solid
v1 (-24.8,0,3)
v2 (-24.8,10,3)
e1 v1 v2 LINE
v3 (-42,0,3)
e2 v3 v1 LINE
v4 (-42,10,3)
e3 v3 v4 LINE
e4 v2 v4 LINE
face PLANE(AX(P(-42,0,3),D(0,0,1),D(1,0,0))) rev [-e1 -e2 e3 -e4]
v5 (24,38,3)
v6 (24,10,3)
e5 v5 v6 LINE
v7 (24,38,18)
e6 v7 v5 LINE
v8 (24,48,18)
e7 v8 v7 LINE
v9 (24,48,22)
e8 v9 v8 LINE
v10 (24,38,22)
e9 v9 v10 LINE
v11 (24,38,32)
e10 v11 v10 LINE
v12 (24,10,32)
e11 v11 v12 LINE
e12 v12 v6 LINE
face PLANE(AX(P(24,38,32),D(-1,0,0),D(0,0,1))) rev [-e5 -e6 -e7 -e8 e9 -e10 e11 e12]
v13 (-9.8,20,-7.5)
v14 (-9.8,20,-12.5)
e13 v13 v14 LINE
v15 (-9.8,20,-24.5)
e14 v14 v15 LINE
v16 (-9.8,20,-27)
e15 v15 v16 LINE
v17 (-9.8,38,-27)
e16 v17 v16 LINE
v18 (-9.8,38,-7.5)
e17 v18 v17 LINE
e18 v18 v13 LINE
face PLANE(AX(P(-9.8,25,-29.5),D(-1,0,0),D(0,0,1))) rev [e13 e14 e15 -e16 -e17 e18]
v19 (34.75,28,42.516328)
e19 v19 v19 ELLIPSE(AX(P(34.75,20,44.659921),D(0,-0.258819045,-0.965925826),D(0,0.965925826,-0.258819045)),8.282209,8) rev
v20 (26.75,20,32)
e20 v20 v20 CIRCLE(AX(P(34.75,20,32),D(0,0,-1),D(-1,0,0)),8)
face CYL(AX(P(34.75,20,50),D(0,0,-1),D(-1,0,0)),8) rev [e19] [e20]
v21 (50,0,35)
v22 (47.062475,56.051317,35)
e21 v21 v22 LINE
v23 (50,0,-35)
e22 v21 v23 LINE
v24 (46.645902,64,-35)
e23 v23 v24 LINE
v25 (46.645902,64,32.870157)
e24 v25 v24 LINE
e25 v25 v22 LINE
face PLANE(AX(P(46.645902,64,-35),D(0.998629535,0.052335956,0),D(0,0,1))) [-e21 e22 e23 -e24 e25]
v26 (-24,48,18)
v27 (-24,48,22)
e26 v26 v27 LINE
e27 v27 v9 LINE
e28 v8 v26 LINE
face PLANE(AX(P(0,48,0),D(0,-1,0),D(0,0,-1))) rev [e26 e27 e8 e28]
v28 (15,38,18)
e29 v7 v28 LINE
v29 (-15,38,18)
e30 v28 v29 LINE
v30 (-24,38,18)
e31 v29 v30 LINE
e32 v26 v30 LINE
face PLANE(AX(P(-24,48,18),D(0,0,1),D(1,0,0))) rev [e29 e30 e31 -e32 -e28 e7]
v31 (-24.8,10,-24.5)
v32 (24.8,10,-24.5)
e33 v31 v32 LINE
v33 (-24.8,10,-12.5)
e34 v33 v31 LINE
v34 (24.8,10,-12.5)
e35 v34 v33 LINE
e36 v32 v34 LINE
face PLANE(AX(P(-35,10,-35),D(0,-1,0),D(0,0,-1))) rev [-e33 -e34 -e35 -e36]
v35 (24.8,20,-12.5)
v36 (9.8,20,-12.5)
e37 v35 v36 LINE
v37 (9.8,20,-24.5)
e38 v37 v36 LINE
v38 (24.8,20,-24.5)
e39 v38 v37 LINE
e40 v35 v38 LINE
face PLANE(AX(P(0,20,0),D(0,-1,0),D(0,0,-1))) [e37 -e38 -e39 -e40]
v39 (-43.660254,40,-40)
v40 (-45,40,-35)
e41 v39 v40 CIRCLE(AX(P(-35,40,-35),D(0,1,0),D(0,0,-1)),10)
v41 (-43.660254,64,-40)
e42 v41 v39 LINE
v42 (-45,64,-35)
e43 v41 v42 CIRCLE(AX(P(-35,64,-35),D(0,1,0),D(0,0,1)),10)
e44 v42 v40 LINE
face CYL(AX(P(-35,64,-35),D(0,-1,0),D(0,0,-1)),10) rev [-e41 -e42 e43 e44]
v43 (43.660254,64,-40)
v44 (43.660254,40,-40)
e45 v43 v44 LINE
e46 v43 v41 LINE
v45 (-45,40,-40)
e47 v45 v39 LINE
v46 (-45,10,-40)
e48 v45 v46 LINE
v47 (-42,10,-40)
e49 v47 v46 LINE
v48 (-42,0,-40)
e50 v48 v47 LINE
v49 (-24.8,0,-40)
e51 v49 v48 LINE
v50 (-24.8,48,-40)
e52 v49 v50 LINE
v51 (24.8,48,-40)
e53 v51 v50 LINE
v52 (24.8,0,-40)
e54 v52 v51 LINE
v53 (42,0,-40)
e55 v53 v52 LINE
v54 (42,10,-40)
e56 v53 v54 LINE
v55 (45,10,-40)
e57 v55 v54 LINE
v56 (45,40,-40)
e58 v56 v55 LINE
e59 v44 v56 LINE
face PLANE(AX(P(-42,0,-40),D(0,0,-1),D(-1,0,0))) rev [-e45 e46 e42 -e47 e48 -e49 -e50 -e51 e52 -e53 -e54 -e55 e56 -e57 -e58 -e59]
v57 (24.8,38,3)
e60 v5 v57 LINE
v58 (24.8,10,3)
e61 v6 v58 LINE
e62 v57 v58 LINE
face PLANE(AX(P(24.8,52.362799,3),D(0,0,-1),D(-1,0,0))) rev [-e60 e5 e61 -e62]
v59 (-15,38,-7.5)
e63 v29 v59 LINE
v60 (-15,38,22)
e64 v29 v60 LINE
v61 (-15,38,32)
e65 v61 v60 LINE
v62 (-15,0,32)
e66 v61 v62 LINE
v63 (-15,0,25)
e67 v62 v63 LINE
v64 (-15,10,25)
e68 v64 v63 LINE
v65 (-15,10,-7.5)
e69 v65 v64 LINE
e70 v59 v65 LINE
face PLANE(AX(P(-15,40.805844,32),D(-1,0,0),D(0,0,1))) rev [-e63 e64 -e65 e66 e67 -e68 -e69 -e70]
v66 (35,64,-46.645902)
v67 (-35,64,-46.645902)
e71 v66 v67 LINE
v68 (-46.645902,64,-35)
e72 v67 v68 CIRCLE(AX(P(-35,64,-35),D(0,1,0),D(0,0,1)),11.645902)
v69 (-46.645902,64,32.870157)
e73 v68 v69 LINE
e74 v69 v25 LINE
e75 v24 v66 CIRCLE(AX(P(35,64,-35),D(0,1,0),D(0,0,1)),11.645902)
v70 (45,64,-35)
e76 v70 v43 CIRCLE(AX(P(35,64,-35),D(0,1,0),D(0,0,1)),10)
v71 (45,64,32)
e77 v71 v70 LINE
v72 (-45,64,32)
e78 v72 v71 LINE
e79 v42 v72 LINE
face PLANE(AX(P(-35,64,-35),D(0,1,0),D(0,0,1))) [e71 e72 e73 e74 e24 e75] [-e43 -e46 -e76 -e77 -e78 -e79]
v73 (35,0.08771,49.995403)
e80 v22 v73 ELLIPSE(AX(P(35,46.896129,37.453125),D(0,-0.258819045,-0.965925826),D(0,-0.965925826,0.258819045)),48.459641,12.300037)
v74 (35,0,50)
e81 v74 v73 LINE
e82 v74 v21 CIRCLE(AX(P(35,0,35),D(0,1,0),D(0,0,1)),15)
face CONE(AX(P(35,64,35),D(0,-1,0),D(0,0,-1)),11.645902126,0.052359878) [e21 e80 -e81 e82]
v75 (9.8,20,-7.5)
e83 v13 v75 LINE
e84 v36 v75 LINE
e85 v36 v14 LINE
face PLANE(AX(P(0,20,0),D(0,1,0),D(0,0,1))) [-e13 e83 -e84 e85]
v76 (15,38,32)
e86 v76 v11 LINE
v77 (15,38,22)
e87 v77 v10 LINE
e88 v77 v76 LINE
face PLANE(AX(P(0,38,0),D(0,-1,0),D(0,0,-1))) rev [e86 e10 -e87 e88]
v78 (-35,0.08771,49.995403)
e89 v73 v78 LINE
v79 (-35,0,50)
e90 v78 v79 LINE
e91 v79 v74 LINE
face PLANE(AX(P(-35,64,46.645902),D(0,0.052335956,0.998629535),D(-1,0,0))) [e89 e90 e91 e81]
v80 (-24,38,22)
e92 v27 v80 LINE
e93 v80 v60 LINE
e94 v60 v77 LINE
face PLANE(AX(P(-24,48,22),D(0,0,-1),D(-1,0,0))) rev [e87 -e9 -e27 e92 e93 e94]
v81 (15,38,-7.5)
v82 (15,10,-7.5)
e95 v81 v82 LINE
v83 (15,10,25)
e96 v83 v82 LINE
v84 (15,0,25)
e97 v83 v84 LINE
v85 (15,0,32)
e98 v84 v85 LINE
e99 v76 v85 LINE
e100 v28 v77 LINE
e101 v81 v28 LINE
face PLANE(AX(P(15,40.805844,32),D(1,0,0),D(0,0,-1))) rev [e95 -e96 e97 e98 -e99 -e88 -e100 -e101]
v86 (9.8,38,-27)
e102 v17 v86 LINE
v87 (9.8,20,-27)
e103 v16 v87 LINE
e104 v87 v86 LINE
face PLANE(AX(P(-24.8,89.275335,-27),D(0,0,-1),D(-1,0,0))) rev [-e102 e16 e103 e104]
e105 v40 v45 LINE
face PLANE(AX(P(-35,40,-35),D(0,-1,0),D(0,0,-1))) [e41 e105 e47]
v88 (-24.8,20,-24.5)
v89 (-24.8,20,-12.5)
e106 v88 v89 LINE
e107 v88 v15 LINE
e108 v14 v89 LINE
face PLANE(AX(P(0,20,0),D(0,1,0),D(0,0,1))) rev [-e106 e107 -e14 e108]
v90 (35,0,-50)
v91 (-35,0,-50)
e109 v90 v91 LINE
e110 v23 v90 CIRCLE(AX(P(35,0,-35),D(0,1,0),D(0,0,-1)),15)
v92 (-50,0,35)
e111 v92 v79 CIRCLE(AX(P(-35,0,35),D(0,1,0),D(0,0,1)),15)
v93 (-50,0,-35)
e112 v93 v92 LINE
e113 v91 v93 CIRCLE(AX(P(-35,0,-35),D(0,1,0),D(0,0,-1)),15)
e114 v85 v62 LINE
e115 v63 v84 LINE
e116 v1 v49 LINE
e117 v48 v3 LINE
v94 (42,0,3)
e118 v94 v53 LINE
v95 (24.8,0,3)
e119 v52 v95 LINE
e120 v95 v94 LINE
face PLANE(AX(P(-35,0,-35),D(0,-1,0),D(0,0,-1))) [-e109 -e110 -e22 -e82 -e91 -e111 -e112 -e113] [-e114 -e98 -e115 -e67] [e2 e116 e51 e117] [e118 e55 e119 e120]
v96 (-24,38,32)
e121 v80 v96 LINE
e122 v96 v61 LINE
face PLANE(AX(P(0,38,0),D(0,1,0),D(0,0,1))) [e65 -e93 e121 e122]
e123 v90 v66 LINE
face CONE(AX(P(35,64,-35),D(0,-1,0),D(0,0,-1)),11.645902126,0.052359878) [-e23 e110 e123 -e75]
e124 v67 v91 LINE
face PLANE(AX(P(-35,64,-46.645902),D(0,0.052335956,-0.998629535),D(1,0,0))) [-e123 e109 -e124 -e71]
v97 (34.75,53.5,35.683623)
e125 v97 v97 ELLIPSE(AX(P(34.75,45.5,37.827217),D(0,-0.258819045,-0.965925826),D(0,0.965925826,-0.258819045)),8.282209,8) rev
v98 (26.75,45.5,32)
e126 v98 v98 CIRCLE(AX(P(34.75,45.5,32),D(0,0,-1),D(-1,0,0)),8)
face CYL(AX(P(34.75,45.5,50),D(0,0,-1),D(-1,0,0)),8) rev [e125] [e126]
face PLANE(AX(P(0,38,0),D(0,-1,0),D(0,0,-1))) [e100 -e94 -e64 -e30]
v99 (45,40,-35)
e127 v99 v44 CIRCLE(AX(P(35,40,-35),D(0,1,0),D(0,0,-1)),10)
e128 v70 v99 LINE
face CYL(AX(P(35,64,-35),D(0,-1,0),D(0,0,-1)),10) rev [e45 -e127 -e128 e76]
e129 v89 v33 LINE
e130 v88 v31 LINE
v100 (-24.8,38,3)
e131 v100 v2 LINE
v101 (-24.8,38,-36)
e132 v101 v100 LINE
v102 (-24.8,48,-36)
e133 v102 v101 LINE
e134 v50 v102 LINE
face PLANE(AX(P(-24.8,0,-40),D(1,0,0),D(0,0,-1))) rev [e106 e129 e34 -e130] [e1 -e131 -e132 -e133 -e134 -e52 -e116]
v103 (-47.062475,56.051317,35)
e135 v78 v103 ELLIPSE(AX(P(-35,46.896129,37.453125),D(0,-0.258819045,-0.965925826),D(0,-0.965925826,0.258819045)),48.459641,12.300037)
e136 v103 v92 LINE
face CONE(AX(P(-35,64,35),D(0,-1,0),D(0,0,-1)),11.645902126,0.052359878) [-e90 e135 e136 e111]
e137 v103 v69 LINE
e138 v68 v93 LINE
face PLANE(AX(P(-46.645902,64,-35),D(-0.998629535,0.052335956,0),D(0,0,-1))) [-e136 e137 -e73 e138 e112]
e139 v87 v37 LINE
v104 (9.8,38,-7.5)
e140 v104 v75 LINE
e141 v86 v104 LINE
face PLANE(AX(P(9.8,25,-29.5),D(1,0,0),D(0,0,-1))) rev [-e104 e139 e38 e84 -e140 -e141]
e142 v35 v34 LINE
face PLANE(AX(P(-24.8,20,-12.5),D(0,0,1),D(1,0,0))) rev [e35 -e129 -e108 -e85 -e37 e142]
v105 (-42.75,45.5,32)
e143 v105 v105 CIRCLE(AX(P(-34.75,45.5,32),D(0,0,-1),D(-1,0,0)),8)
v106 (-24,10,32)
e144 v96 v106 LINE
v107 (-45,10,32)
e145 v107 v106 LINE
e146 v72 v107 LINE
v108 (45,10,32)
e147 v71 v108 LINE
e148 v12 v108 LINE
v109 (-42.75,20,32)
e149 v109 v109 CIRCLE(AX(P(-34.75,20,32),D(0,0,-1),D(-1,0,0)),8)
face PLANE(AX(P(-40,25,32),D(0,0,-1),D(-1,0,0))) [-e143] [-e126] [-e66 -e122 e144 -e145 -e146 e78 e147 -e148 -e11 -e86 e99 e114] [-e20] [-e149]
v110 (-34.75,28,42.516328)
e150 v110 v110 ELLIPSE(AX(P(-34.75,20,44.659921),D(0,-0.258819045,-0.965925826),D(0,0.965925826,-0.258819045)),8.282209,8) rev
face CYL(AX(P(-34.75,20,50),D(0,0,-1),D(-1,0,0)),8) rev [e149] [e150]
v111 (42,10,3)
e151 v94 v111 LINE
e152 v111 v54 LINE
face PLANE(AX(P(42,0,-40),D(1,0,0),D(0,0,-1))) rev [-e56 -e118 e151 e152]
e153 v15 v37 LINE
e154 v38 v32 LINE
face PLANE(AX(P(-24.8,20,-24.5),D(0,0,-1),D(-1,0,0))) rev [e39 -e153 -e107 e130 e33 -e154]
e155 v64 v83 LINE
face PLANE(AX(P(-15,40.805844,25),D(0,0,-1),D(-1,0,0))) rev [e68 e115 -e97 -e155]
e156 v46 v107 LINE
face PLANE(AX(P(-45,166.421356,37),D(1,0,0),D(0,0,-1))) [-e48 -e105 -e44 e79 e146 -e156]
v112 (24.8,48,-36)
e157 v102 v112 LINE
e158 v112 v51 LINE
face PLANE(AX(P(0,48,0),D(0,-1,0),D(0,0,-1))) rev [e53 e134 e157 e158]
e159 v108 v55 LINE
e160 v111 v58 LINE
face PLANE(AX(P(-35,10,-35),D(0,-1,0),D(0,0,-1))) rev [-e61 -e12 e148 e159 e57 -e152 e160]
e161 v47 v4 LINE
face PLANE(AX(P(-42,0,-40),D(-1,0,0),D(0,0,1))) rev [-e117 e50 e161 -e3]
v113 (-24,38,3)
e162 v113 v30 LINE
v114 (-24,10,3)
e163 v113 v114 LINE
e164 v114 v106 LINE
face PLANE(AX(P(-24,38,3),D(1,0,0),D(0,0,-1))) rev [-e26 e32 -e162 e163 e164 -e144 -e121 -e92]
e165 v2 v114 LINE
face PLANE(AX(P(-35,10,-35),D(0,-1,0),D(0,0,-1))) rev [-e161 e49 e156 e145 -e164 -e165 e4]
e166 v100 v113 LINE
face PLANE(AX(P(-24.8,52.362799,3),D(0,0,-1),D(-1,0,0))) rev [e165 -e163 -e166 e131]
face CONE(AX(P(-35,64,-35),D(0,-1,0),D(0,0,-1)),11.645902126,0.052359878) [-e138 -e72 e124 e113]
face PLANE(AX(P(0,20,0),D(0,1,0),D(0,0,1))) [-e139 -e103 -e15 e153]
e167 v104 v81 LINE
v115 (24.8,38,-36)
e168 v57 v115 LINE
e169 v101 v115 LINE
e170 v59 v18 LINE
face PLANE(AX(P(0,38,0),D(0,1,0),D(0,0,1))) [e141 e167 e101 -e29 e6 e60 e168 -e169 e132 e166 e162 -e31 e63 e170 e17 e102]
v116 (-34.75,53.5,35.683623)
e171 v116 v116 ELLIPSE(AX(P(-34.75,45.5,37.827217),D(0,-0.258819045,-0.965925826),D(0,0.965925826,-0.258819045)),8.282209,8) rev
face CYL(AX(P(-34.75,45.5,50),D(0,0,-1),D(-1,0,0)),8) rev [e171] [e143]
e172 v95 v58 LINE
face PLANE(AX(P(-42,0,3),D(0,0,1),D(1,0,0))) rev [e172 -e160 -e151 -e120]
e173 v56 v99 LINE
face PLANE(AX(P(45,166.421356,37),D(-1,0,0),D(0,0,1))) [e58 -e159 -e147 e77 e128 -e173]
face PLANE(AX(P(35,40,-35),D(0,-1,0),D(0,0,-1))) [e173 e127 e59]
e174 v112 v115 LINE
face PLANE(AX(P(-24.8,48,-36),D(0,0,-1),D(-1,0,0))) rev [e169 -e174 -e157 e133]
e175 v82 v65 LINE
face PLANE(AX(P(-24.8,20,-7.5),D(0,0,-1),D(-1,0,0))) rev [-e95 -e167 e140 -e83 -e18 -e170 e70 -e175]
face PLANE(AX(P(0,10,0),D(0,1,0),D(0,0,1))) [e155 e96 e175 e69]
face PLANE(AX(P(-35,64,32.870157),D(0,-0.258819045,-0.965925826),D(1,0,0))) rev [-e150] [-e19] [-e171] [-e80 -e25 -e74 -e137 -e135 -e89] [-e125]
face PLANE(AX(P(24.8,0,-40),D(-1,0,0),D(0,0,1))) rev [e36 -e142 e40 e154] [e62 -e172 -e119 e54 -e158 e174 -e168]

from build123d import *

# Parameters (mm, degrees)
BOSS_EXTRUDE1_DEPTH  = 10
SKETCH2_W            = 17.2
SKETCH2_H            = 43
CUT_EXTRUDE1_DEPTH   = 72.414284285
SKETCH3_W            = 90
SKETCH3_H            = 34
SKETCH3_W_2          = 80
SKETCH3_H_2          = 24
BOSS_EXTRUDE3_DEPTH  = 15
SKETCH4_W            = 49.6
SKETCH4_H            = 5
BOSS_EXTRUDE4_DEPTH  = 10
SKETCH5_W            = 15
SKETCH5_H            = 22
BOSS_EXTRUDE5_DEPTH  = 5
SKETCH6_W            = 90
SKETCH6_H            = 77
BOSS_EXTRUDE6_DEPTH  = 15
BOSS_EXTRUDE8_DEPTH  = 39
CHAMFER1_SIZE        = 64
CHAMFER1_SIZE_2      = 3.354097874
CHAMFER3_SIZE        = 64
CHAMFER3_SIZE_2      = 13.775745352
CUT_EXTRUDE6_DEPTH   = 2.5
CUT_EXTRUDE8_DEPTH   = 15
CUT_EXTRUDE9_DEPTH   = 15
SKETCH22_W           = 30
SKETCH22_H           = 7
CUT_EXTRUDE10_DEPTH  = 10
SKETCH25_R           = 8
CUT_EXTRUDE19_DEPTH  = 116.41230437
SKETCH29_W           = 9
SKETCH29_H           = 29
BOSS_EXTRUDE10_DEPTH = 28
SKETCH31_W           = 49.6
SKETCH31_H           = 13
BOSS_EXTRUDE12_DEPTH = 28
SKETCH30_W           = 49.6
SKETCH30_H           = 4
SKETCH30_W_2         = 48
BOSS_EXTRUDE11_DEPTH = 10
SKETCH33_W           = 15
SKETCH33_H           = 19.5
BOSS_EXTRUDE13_DEPTH = 13
SKETCH23_W           = 30
SKETCH23_H           = 28.995403325
CUT_EXTRUDE17_DEPTH  = 5
SKETCH34_W           = 9.8
SKETCH34_H           = 10.5
BOSS_EXTRUDE14_DEPTH = 28
SKETCH35_W           = 30
SKETCH35_H           = 10.5
CUT_EXTRUDE22_DEPTH  = 5
SKETCH37_W           = 30
SKETCH37_H           = 32.5
BOSS_EXTRUDE15_DEPTH = 5


with BuildPart() as part:
    # Sketch1 → Boss-Extrude1 (new body)
    with BuildSketch(Plane(origin=(0, 0, 0), x_dir=(1, 0, 0), z_dir=(0, 1, 0))):
        with BuildLine():
            Line((-35, 50), (35, 50))
            ThreePointArc((35, 50), (45.606601718, 45.606601718), (50, 35))
            Line((50, 35), (50, -35))
            ThreePointArc((50, -35), (45.606601718, -45.606601718), (35, -50))
            Line((35, -50), (-35, -50))
            ThreePointArc((-35, -50), (-45.606601718, -45.606601718), (-50, -35))
            Line((-50, -35), (-50, 35))
            ThreePointArc((-50, 35), (-45.606601718, 45.606601718), (-35, 50))
        make_face()
    extrude(amount=BOSS_EXTRUDE1_DEPTH)

    # Sketch2 → Cut-Extrude1 (cut, through all)
    with BuildSketch(Plane(origin=(0, 10, 0), x_dir=(1, 0, 0), z_dir=(0, 1, 0))):
        with Locations((-33.4, 18.5)):
            Rectangle(SKETCH2_W, SKETCH2_H)
        with Locations((33.4, 18.5)):
            Rectangle(SKETCH2_W, SKETCH2_H)
    extrude(amount=-CUT_EXTRUDE1_DEPTH, mode=Mode.SUBTRACT)

    # Sketch3 → Boss-Extrude3 (add)
    with BuildSketch(Plane(origin=(0, 10, 0), x_dir=(1, 0, 0), z_dir=(0, 1, 0))):
        with Locations((0, -20)):
            Rectangle(SKETCH3_W, SKETCH3_H)
        with Locations((0, -20)):
            Rectangle(SKETCH3_W_2, SKETCH3_H_2, mode=Mode.SUBTRACT)
    extrude(amount=BOSS_EXTRUDE3_DEPTH)

    # Sketch4 → Boss-Extrude4 (add)
    with BuildSketch(Plane(origin=(0, 10, 0), x_dir=(1, 0, 0), z_dir=(0, 1, 0))):
        with Locations((0, 10)):
            Rectangle(SKETCH4_W, SKETCH4_H)
        with Locations((0, 27)):
            Rectangle(SKETCH4_W, SKETCH4_H)
    extrude(amount=BOSS_EXTRUDE4_DEPTH)

    # Sketch5 → Boss-Extrude5 (add)
    with BuildSketch(Plane(origin=(0, 20, 0), x_dir=(1, 0, 0), z_dir=(0, 1, 0))):
        with Locations((-17.3, 18.5)):
            Rectangle(SKETCH5_W, SKETCH5_H)
        with Locations((17.3, 18.5)):
            Rectangle(SKETCH5_W, SKETCH5_H)
    extrude(amount=BOSS_EXTRUDE5_DEPTH)

    # Sketch6 → Boss-Extrude6 (add)
    with BuildSketch(Plane(origin=(0, 10, 0), x_dir=(1, 0, 0), z_dir=(0, 1, 0))):
        with BuildLine():
            Line((-50, 35), (-50, -35))
            ThreePointArc((-50, -35), (-45.606601718, -45.606601718), (-35, -50))
            Line((-35, -50), (35, -50))
            ThreePointArc((35, -50), (45.606601718, -45.606601718), (50, -35))
            Line((50, -35), (50, 35))
            ThreePointArc((50, 35), (45.606601718, 45.606601718), (35, 50))
            Line((35, 50), (-35, 50))
            ThreePointArc((-35, 50), (-45.606601718, 45.606601718), (-50, 35))
        make_face()
        with Locations((0, 1.5)):
            Rectangle(SKETCH6_W, SKETCH6_H, mode=Mode.SUBTRACT)
    extrude(amount=BOSS_EXTRUDE6_DEPTH)

    # Sketch9 → Boss-Extrude8 (add)
    with BuildSketch(Plane(origin=(0, 25, 0), x_dir=(1, 0, 0), z_dir=(0, 1, 0))):
        with BuildLine():
            Line((-50, 35), (-50, -35))
            ThreePointArc((-50, -35), (-45.606601718, -45.606601718), (-35, -50))
            Line((-35, -50), (35, -50))
            ThreePointArc((35, -50), (45.606601718, -45.606601718), (50, -35))
            Line((50, -35), (50, 35))
            ThreePointArc((50, 35), (45.606601718, 45.606601718), (35, 50))
            Line((35, 50), (-35, 50))
            ThreePointArc((-35, 50), (-45.606601718, 45.606601718), (-50, 35))
        make_face()
        with BuildLine():
            Line((-45, 35), (-45, -32))
            Line((-45, -32), (45, -32))
            Line((45, -32), (45, 35))
            ThreePointArc((45, 35), (44.659258263, 37.588190451), (43.660254038, 40))
            Line((43.660254038, 40), (-43.660254038, 40))
            ThreePointArc((-43.660254038, 40), (-44.659258263, 37.588190451), (-45, 35))
        make_face(mode=Mode.SUBTRACT)
    extrude(amount=BOSS_EXTRUDE8_DEPTH)

    # Chamfer1
    # the kernel refuses this chamfer: 64, 3.354097874 mm, written as the material it takes off along each edge
    with BuildSketch(Plane(origin=(-35, 64, 50), x_dir=(0, -0.9999979738662979, 0.002013023422382214), z_dir=(1, 0, 0)), Plane(origin=(50, 64, 35), x_dir=(0.002013023422382214, -0.9999979738662979, 0), z_dir=(0, 0, -1)), Plane(origin=(-50, 64, -35), x_dir=(-0.002013023422382214, -0.9999979738662979, 0), z_dir=(0, 0, 1)), Plane(origin=(35, 64, -50), x_dir=(0, -0.9999979738662979, -0.002013023422382214), z_dir=(-1, 0, 0))) as chamfer1_piece_1:
        Polygon((CHAMFER1_SIZE * 0.999997973866, CHAMFER1_SIZE * 0.00201302342238), (-CHAMFER1_SIZE_2 * 0.00201302342245, CHAMFER1_SIZE_2 * 0.9999979739), (0, 0), align=None)
    extrude(amount=70, mode=Mode.SUBTRACT)
    with BuildSketch(Plane(origin=(35, 64, 35), x_dir=(0, 0, 1), z_dir=(-1, 0, 0))) as chamfer1_piece_2:
        Polygon((15, -CHAMFER1_SIZE), (15 - CHAMFER1_SIZE_2, 0), (15, 0), align=None)
    revolve(axis=Axis((35, 64, 35), (0, 1, 0)), revolution_arc=90, mode=Mode.SUBTRACT)
    with BuildSketch(Plane(origin=(-35, 64, 35), x_dir=(-1, 0, 0), z_dir=(0, 0, -1))) as chamfer1_piece_3:
        Polygon((15, -CHAMFER1_SIZE), (15 - CHAMFER1_SIZE_2, 0), (15, 0), align=None)
    revolve(axis=Axis((-35, 64, 35), (0, 1, 0)), revolution_arc=90, mode=Mode.SUBTRACT)
    with BuildSketch(Plane(origin=(35, 64, -35), x_dir=(1, 0, 0), z_dir=(0, 0, 1))) as chamfer1_piece_4:
        Polygon((15, -CHAMFER1_SIZE), (15 - CHAMFER1_SIZE_2, 0), (15, 0), align=None)
    revolve(axis=Axis((35, 64, -35), (0, 1, 0)), revolution_arc=90, mode=Mode.SUBTRACT)
    with BuildSketch(Plane(origin=(-35, 64, -35), x_dir=(0, 0, -1), z_dir=(1, 0, 0))) as chamfer1_piece_5:
        Polygon((15 - CHAMFER1_SIZE_2, 0), (15, -CHAMFER1_SIZE), (15, 0), align=None)
    revolve(axis=Axis((-35, 64, -35), (0, 1, 0)), revolution_arc=90, mode=Mode.SUBTRACT)

    # Chamfer3
    # the kernel refuses this chamfer: 64, 13.775745352 mm, written as the material it takes off along each edge
    with BuildSketch(Plane(origin=(-201.265469314, 64, 46.645902126), x_dir=(0, -0.9981787050157903, 0.06032638604292662), z_dir=(1, 0, 0))) as chamfer3_piece_1:
        Polygon((CHAMFER3_SIZE * 0.999967974892, CHAMFER3_SIZE * 0.00800307379952), (-CHAMFER3_SIZE_2 * 0.060326386045, CHAMFER3_SIZE_2 * 0.99817870505), (0, 0), align=None)
    extrude(amount=402.530938629, mode=Mode.SUBTRACT)

    # Sketch17 → Cut-Extrude6 (cut)
    with BuildSketch(Plane(origin=(0, 0, -29.5), x_dir=(-1, 0, 0), z_dir=(0, 0, -1))):
        Polygon((-24.8, 10), (24.8, 10), (24.8, 25), (9.8, 25), (9.8, 20), (-9.8, 20), (-9.8, 25), (-24.8, 25), align=None)
    extrude(amount=-CUT_EXTRUDE6_DEPTH, mode=Mode.SUBTRACT)

    # Sketch20 → Cut-Extrude8 (cut)
    with BuildSketch(Plane.XZ.offset(-25)):
        with BuildLine():
            Line((-45, -35), (-45, -40))
            Line((-45, -40), (-43.660254038, -40))
            ThreePointArc((-43.660254038, -40), (-44.659258263, -37.588190451), (-45, -35))
        make_face()
        with BuildLine():
            Line((45, -40), (45, -35))
            ThreePointArc((45, -35), (44.659258263, -37.588190451), (43.660254038, -40))
            Line((43.660254038, -40), (45, -40))
        make_face()
    extrude(amount=-CUT_EXTRUDE8_DEPTH, mode=Mode.SUBTRACT)

    # Sketch21 → Cut-Extrude9 (cut)
    with BuildSketch(Plane(origin=(0, 25, 0), x_dir=(1, 0, 0), z_dir=(0, 1, 0))):
        Polygon((40, -8), (40, -32), (45, -32), (45, -3), (-45, -3), (-45, -32), (-40, -32), (-40, -8), align=None)
    extrude(amount=-CUT_EXTRUDE9_DEPTH, mode=Mode.SUBTRACT)

    # Sketch22 → Cut-Extrude10 (cut)
    with BuildSketch(Plane.XZ):
        with Locations((0, 28.5)):
            Rectangle(SKETCH22_W, SKETCH22_H)
    extrude(amount=-CUT_EXTRUDE10_DEPTH, mode=Mode.SUBTRACT)

    # Sketch25 → Cut-Extrude19 (cut, through all)
    with BuildSketch(Plane(origin=(0, 0, 32), x_dir=(-1, 0, 0), z_dir=(0, 0, -1))):
        with Locations((-34.75, 45.5)):
            Circle(SKETCH25_R)
        with Locations((34.75, 45.5)):
            Circle(SKETCH25_R)
        with Locations((-34.75, 20)):
            Circle(SKETCH25_R)
        with Locations((34.75, 20)):
            Circle(SKETCH25_R)
    extrude(amount=-CUT_EXTRUDE19_DEPTH, mode=Mode.SUBTRACT)

    # Sketch29 → Boss-Extrude10 (add)
    with BuildSketch(Plane(origin=(0, 10, 0), x_dir=(1, 0, 0), z_dir=(0, 1, 0))):
        with Locations((-19.5, -17.5)):
            Rectangle(SKETCH29_W, SKETCH29_H)
        with Locations((19.5, -17.5)):
            Rectangle(SKETCH29_W, SKETCH29_H)
    extrude(amount=BOSS_EXTRUDE10_DEPTH)

    # Sketch31 → Boss-Extrude12 (add)
    with BuildSketch(Plane(origin=(0, 10, 0), x_dir=(1, 0, 0), z_dir=(0, 1, 0))):
        with Locations((0, 33.5)):
            Rectangle(SKETCH31_W, SKETCH31_H)
    extrude(amount=BOSS_EXTRUDE12_DEPTH)

    # Sketch30 → Boss-Extrude11 (add)
    with BuildSketch(Plane(origin=(0, 38, 0), x_dir=(1, 0, 0), z_dir=(0, 1, 0))):
        with Locations((0, 38)):
            Rectangle(SKETCH30_W, SKETCH30_H)
        with Locations((0, -20)):
            Rectangle(SKETCH30_W_2, SKETCH30_H)
    extrude(amount=BOSS_EXTRUDE11_DEPTH)

    # Sketch33 → Boss-Extrude13 (add)
    with BuildSketch(Plane(origin=(0, 25, 0), x_dir=(1, 0, 0), z_dir=(0, 1, 0))):
        with Locations((17.3, 17.25)):
            Rectangle(SKETCH33_W, SKETCH33_H)
        with Locations((-17.3, 17.25)):
            Rectangle(SKETCH33_W, SKETCH33_H)
    extrude(amount=BOSS_EXTRUDE13_DEPTH)

    # Sketch23 → Cut-Extrude17 (cut)
    with BuildSketch(Plane(origin=(0, 10, 0), x_dir=(1, 0, 0), z_dir=(0, 1, 0))):
        with Locations((0, -17.497701662)):
            Rectangle(SKETCH23_W, SKETCH23_H)
    extrude(amount=-CUT_EXTRUDE17_DEPTH, mode=Mode.SUBTRACT)

    # Sketch34 → Boss-Extrude14 (add)
    with BuildSketch(Plane(origin=(0, 10, 0), x_dir=(1, 0, 0), z_dir=(0, 1, 0))):
        with Locations((-19.9, 2.25)):
            Rectangle(SKETCH34_W, SKETCH34_H)
        with Locations((19.9, 2.25)):
            Rectangle(SKETCH34_W, SKETCH34_H)
    extrude(amount=BOSS_EXTRUDE14_DEPTH)

    # Sketch35 → Cut-Extrude22 (cut)
    with BuildSketch(Plane(origin=(0, 10, 0), x_dir=(1, 0, 0), z_dir=(0, 1, 0))):
        with Locations((0, 2.25)):
            Rectangle(SKETCH35_W, SKETCH35_H)
    extrude(amount=-CUT_EXTRUDE22_DEPTH, mode=Mode.SUBTRACT)

    # Sketch37 → Boss-Extrude15 (add)
    with BuildSketch(Plane(origin=(0, 5, 0), x_dir=(1, 0, 0), z_dir=(0, 1, 0))):
        with Locations((0, -8.75)):
            Rectangle(SKETCH37_W, SKETCH37_H)
    extrude(amount=BOSS_EXTRUDE15_DEPTH)


solid = part.part
